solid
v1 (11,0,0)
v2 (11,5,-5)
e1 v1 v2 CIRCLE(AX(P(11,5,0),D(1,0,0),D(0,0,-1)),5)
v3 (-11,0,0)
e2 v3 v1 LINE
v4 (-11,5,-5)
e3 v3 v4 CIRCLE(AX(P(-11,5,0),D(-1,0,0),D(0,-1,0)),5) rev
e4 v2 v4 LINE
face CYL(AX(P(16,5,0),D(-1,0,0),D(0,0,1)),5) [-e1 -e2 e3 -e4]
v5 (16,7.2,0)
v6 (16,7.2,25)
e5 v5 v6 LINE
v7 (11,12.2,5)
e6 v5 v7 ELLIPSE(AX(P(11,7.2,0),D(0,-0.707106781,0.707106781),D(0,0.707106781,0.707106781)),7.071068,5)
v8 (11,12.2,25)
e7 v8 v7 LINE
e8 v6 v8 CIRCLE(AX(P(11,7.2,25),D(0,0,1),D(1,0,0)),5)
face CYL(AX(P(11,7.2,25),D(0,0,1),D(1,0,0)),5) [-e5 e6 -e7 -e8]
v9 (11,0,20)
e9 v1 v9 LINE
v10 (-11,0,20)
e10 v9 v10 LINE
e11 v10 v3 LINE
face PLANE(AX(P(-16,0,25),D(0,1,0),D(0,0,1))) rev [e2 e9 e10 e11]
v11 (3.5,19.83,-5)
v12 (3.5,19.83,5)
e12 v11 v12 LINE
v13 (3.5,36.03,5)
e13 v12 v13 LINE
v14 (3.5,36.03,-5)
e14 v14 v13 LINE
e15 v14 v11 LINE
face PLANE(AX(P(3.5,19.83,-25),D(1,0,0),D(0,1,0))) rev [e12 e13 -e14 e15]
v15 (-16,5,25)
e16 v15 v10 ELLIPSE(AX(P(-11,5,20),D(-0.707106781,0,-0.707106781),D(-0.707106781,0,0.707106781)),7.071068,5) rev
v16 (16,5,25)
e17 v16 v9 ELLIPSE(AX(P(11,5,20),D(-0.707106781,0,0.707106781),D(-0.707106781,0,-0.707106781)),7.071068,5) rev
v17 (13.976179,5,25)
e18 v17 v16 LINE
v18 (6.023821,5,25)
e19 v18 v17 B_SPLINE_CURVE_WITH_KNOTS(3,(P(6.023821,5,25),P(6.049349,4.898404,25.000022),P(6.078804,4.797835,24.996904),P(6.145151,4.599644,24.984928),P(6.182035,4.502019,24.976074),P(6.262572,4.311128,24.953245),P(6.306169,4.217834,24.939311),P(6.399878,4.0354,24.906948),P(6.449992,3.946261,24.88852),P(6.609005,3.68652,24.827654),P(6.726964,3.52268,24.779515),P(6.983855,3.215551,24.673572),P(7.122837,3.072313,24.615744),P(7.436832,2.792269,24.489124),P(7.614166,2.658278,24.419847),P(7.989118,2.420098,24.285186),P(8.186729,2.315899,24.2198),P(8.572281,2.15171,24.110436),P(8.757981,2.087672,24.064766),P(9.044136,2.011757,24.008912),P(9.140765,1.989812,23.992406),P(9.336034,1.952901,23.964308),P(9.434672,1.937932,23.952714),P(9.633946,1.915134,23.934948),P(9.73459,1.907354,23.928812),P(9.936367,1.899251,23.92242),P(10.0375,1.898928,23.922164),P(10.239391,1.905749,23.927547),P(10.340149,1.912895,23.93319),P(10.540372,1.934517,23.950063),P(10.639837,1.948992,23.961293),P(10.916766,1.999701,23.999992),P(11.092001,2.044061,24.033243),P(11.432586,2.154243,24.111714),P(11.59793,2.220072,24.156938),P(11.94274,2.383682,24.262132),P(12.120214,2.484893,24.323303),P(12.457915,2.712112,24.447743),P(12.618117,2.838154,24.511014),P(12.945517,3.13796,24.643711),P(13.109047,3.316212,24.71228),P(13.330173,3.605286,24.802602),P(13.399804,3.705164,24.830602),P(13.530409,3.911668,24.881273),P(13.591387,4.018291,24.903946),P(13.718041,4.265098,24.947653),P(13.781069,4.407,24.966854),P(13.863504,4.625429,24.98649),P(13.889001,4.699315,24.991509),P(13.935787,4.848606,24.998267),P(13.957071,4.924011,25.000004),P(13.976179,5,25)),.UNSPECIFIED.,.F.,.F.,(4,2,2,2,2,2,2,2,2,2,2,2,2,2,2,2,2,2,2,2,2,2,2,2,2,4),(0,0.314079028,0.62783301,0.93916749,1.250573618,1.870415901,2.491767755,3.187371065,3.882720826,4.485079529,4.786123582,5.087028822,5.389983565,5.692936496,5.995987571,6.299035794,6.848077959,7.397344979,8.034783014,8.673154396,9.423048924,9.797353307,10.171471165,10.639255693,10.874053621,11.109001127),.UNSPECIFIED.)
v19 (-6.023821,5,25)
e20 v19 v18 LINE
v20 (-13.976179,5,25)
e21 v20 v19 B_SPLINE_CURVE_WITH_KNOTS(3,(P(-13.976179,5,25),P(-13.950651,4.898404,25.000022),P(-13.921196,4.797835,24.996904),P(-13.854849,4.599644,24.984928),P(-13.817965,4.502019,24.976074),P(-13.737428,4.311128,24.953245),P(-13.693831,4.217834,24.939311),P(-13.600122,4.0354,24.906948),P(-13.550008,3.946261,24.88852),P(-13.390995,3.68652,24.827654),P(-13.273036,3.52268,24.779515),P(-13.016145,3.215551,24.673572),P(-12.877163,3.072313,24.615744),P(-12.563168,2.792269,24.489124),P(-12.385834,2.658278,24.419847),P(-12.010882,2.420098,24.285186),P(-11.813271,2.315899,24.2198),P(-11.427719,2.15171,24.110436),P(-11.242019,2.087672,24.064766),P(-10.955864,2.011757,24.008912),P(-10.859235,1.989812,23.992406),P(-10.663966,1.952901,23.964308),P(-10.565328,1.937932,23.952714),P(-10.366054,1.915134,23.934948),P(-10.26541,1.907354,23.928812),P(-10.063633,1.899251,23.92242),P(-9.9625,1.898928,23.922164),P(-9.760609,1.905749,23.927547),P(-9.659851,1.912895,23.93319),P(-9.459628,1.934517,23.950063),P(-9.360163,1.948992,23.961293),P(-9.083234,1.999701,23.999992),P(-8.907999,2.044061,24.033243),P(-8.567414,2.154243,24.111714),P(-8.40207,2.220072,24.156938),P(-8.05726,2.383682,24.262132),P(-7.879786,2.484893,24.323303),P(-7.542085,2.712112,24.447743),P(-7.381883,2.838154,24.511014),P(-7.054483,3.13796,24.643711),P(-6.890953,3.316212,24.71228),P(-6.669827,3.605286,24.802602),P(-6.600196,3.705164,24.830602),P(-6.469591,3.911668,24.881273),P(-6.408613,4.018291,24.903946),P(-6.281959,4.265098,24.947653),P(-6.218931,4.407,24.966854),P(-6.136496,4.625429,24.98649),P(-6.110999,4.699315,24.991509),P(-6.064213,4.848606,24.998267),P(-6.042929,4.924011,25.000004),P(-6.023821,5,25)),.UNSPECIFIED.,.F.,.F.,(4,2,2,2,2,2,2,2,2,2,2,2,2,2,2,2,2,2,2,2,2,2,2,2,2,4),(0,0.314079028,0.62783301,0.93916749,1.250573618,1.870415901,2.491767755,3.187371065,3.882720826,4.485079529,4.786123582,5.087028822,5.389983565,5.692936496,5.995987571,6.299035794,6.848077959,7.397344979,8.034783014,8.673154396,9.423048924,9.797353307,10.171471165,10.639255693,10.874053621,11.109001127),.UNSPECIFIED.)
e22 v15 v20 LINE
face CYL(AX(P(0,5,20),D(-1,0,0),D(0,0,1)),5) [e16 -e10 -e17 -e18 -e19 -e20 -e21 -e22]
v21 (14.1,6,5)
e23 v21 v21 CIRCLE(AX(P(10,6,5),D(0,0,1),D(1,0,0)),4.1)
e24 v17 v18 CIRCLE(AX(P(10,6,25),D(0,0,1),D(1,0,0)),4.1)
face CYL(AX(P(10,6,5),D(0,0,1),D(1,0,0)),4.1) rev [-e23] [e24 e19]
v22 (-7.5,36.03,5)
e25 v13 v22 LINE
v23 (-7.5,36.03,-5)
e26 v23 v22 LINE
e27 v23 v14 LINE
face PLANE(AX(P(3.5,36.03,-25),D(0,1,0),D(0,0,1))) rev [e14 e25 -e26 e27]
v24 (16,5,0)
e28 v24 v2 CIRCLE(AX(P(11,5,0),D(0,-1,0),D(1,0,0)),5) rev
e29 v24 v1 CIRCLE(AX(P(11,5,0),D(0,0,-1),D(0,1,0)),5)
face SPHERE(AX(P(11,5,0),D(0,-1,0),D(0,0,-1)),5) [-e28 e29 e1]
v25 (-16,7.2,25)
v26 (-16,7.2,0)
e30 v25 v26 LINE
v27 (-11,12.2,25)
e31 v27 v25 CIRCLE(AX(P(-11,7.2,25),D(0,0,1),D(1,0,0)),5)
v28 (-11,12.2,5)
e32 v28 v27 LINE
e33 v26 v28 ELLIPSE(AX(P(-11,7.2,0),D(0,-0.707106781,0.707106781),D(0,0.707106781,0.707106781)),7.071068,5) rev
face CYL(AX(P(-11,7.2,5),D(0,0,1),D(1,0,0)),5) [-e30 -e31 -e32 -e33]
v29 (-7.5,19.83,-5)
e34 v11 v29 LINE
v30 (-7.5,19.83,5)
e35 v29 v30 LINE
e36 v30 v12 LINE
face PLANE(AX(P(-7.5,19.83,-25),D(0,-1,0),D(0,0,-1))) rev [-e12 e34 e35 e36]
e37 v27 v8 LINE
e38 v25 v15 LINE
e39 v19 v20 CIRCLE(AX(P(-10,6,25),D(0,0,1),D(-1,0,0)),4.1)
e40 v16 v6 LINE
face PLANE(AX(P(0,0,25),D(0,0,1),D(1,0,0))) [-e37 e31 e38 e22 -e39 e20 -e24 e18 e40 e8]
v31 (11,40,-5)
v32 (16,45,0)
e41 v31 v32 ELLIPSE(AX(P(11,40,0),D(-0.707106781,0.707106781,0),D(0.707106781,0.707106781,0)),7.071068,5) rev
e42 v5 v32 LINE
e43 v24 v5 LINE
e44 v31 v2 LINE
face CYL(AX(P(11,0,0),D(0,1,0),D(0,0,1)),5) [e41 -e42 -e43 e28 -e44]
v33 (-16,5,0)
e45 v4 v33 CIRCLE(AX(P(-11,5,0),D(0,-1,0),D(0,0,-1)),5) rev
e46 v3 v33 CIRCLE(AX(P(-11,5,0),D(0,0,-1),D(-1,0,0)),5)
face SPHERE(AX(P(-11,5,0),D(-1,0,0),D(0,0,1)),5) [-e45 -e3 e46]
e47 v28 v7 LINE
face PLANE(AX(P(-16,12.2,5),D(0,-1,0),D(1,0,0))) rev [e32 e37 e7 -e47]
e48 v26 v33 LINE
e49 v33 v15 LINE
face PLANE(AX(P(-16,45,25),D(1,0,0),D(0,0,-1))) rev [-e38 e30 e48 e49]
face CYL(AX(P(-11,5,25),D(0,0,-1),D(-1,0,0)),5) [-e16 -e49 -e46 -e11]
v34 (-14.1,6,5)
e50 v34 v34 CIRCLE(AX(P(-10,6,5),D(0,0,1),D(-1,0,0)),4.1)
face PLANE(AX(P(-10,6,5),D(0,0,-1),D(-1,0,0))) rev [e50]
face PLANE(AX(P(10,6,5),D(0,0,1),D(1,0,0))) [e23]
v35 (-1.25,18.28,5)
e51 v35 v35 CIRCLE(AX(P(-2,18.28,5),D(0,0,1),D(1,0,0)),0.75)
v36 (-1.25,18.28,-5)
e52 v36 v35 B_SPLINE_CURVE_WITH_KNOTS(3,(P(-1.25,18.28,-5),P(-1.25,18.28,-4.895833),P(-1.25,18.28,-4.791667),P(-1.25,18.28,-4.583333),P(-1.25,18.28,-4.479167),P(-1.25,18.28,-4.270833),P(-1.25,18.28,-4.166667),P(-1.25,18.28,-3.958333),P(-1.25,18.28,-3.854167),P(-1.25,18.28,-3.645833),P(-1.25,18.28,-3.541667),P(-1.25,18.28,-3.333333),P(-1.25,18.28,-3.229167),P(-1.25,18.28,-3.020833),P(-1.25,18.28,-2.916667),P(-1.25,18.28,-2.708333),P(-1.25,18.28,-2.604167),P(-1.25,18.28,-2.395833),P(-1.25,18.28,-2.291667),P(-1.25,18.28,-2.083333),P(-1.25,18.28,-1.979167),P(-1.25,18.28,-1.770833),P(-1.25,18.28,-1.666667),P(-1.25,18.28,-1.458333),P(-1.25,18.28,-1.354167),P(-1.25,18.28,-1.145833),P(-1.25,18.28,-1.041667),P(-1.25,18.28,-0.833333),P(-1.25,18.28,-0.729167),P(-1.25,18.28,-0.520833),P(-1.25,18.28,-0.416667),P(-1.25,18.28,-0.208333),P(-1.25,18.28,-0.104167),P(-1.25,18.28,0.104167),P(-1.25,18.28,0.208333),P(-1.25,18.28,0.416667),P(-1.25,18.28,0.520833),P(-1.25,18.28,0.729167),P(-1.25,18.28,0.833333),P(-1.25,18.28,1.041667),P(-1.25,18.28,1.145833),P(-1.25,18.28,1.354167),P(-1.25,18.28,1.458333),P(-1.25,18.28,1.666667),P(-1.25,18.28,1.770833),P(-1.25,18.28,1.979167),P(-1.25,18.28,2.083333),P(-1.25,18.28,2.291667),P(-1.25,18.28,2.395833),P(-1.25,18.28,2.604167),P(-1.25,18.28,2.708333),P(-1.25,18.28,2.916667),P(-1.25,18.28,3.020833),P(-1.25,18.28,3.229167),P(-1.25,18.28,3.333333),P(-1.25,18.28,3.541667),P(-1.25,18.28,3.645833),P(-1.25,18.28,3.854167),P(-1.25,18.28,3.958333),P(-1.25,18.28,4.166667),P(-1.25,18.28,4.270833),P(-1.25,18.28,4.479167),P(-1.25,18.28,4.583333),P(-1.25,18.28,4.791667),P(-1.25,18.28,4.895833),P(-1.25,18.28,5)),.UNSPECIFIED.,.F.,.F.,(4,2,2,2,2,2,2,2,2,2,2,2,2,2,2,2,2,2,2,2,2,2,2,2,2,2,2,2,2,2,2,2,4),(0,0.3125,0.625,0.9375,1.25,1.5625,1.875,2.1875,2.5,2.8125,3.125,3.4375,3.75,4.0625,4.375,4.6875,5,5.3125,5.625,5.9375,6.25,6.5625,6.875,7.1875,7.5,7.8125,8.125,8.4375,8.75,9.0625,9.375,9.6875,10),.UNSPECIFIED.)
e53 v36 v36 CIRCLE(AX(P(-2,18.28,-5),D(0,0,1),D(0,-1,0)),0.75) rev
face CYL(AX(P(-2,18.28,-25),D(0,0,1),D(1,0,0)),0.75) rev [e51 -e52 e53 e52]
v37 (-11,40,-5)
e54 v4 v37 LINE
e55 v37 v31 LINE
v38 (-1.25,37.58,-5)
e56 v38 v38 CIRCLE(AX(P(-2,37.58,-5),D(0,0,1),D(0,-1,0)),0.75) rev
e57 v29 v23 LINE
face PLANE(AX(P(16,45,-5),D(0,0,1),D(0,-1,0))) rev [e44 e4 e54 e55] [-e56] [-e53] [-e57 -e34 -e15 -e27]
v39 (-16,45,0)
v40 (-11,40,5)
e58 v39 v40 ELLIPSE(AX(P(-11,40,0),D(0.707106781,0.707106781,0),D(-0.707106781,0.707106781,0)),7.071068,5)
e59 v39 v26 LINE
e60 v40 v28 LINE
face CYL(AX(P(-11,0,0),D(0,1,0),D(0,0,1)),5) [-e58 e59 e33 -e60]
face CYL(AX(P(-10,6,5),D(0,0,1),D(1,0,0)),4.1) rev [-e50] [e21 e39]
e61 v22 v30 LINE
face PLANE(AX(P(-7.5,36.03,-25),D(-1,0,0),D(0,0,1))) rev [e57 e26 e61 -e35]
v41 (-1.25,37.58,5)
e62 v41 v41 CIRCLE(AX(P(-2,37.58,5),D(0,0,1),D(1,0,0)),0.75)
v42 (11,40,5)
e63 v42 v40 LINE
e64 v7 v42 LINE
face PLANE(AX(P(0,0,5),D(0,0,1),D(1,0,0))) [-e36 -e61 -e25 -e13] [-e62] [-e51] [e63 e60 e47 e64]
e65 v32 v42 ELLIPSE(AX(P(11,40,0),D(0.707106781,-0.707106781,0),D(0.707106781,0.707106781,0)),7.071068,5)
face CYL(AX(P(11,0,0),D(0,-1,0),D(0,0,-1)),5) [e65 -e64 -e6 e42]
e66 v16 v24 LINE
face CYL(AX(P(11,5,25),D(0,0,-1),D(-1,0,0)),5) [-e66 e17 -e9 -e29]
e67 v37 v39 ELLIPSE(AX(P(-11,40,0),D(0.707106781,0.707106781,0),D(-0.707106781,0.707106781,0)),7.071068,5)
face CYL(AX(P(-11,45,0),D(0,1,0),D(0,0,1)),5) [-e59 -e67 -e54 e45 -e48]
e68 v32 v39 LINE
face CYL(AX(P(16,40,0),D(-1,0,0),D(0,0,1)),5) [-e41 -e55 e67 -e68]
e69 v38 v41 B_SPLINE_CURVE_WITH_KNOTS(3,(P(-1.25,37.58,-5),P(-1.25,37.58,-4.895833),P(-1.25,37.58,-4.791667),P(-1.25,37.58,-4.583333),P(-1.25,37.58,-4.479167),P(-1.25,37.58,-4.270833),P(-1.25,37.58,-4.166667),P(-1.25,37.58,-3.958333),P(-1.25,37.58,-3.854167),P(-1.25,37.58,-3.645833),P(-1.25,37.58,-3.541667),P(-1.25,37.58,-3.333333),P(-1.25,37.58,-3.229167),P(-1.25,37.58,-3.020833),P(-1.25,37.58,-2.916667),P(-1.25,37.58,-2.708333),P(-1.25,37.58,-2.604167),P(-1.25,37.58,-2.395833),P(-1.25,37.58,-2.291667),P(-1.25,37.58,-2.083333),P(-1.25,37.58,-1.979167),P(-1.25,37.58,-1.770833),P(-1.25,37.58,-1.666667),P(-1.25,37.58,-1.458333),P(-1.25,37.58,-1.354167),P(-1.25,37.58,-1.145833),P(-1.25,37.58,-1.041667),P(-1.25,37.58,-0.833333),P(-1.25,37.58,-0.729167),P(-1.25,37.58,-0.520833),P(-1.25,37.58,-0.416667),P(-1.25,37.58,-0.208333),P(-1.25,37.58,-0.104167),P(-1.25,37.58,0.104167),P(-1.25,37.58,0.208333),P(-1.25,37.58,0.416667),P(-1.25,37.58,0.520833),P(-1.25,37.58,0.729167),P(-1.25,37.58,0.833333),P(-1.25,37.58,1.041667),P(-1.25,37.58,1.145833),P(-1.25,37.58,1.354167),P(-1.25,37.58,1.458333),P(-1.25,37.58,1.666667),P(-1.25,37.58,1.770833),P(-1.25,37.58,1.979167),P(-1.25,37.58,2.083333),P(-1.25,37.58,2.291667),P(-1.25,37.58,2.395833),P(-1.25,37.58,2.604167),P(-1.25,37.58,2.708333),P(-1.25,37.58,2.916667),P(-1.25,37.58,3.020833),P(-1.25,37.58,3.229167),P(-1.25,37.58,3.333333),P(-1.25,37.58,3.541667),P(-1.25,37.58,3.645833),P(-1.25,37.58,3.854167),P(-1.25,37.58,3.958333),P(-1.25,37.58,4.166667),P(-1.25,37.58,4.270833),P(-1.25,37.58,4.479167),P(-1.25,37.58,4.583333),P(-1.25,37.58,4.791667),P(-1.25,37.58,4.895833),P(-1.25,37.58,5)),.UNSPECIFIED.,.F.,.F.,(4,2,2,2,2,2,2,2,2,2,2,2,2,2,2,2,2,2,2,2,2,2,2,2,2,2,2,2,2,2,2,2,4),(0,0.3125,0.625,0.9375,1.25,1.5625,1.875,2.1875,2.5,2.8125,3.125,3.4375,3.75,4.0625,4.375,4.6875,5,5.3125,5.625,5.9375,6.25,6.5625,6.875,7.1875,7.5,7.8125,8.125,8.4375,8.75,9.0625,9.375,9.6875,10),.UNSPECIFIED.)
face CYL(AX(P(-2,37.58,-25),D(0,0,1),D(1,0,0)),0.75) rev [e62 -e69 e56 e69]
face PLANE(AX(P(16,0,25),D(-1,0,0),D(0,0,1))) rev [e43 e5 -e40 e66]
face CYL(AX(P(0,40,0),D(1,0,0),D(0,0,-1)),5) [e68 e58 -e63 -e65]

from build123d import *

# Parameters (mm, degrees)
SKETCH1_W           = 32
SKETCH1_H           = 45
BOSS_EXTRUDE1_DEPTH = 25
SKETCH2_R           = 4.1
CUT_EXTRUDE1_DEPTH  = 20
SKETCH3_W           = 32
SKETCH3_H           = 32.8
CUT_EXTRUDE2_DEPTH  = 20
SKETCH4_R           = 0.75
SKETCH4_W           = 11
SKETCH4_H           = 16.2
CUT_EXTRUDE3_DEPTH  = 57.400354609
SKETCH5_W           = 20
SKETCH5_H           = 45
CUT_EXTRUDE5_DEPTH  = 61.613529843
FILLET1_R           = 5


with BuildPart() as part:
    # Sketch1 → Boss-Extrude1 (new, symmetric)
    with BuildSketch(Plane.XY):
        with Locations((0, 22.5)):
            Rectangle(SKETCH1_W, SKETCH1_H)
    extrude(amount=BOSS_EXTRUDE1_DEPTH, both=True)

    # Sketch2 → Cut-Extrude1 (cut)
    with BuildSketch(Plane.XY.offset(25)):
        with Locations((10, 6)):
            Circle(SKETCH2_R)
        with Locations(Location((-10, 6, 0), (0, 0, 180))):
            Circle(SKETCH2_R)
    extrude(amount=-CUT_EXTRUDE1_DEPTH, mode=Mode.SUBTRACT)

    # Sketch3 → Cut-Extrude2 (cut)
    with BuildSketch(Plane.XY.offset(25)):
        with Locations((0, 28.6)):
            Rectangle(SKETCH3_W, SKETCH3_H)
    extrude(amount=-CUT_EXTRUDE2_DEPTH, mode=Mode.SUBTRACT)

    # Sketch4 → Cut-Extrude3 (cut, through all)
    with BuildSketch(Plane.XY.offset(5)):
        with Locations((-2, 37.58)):
            Circle(SKETCH4_R)
        with Locations((-2, 18.28)):
            Circle(SKETCH4_R)
        with Locations((-2, 27.93)):
            Rectangle(SKETCH4_W, SKETCH4_H)
    extrude(amount=-CUT_EXTRUDE3_DEPTH, mode=Mode.SUBTRACT)

    # Sketch5 → Cut-Extrude5 (cut, through all)
    with BuildSketch(Plane.ZY.offset(16)):
        with Locations((-15, 22.5)):
            Rectangle(SKETCH5_W, SKETCH5_H)
    extrude(amount=-CUT_EXTRUDE5_DEPTH, mode=Mode.SUBTRACT)

    # Fillet1
    # the kernel refuses this fillet: 5 mm, written as the material it takes off along each edge
    with BuildSketch(Plane(origin=(-11, 5, 0), x_dir=(-1, 0, 0), z_dir=(0, -1, 0))) as fillet1_piece_1_section:
        Polygon((0, 0), (FILLET1_R * 1.02, 0), (FILLET1_R * 1.02, FILLET1_R * 1.02), (0, FILLET1_R * 1.02), align=None)
    fillet1_piece_1 = extrude(amount=FILLET1_R * 1.02, mode=Mode.PRIVATE)
    fillet1_piece_1 = fillet1_piece_1 - Plane(origin=(-11, 5, 0), x_dir=(0.7071067811865475, 0, 0.7071067811865475), z_dir=(0, -1, 0)) * Sphere(FILLET1_R, mode=Mode.PRIVATE)
    add(fillet1_piece_1, mode=Mode.SUBTRACT)
    with BuildSketch(Plane(origin=(11, 5, 0), x_dir=(1, 0, 0), z_dir=(0, -1, 0))) as fillet1_piece_2_section:
        Polygon((0, 0), (FILLET1_R * 1.02, 0), (FILLET1_R * 1.02, -FILLET1_R * 1.02), (0, -FILLET1_R * 1.02), align=None)
    fillet1_piece_2 = extrude(amount=FILLET1_R * 1.02, mode=Mode.PRIVATE)
    fillet1_piece_2 = fillet1_piece_2 - Plane(origin=(11, 5, 0), x_dir=(-0.7071067811865475, 0, 0.7071067811865475), z_dir=(0, -1, 0)) * Sphere(FILLET1_R, mode=Mode.PRIVATE)
    add(fillet1_piece_2, mode=Mode.SUBTRACT)
    with BuildSketch(Plane(origin=(16, 12.2, 25), x_dir=(0, -1, 0), z_dir=(0, 0, -1))) as fillet1_piece_3:
        with BuildLine():
            CenterArc((FILLET1_R, FILLET1_R), FILLET1_R, 180, 90)
            Line((0, FILLET1_R), (-FILLET1_R * 0.02, FILLET1_R))
            Line((-FILLET1_R * 0.02, FILLET1_R), (-FILLET1_R * 0.02, -FILLET1_R * 0.02))
            Line((-FILLET1_R * 0.02, -FILLET1_R * 0.02), (FILLET1_R, -FILLET1_R * 0.02))
            Line((FILLET1_R, -FILLET1_R * 0.02), (FILLET1_R, 0))
        make_face()
    extrude(amount=20, mode=Mode.SUBTRACT)
    with BuildSketch(Plane(origin=(-11, 0, -5), x_dir=(0, 0, 1), z_dir=(1, 0, 0))) as fillet1_piece_4:
        with BuildLine():
            CenterArc((FILLET1_R, -FILLET1_R), FILLET1_R, 90, 90)
            Line((0, -FILLET1_R), (-FILLET1_R * 0.02, -FILLET1_R))
            Line((-FILLET1_R * 0.02, -FILLET1_R), (-FILLET1_R * 0.02, FILLET1_R * 0.02))
            Line((-FILLET1_R * 0.02, FILLET1_R * 0.02), (FILLET1_R, FILLET1_R * 0.02))
            Line((FILLET1_R, FILLET1_R * 0.02), (FILLET1_R, 0))
        make_face()
    extrude(amount=22, mode=Mode.SUBTRACT)
    with BuildSketch(Plane(origin=(-16, 45, -5), x_dir=(0, -1, 0), z_dir=(1, 0, 0)), Plane(origin=(16, 45, 5), x_dir=(0, -1, 0), z_dir=(-1, 0, 0))) as fillet1_piece_5:
        with BuildLine():
            CenterArc((FILLET1_R, -FILLET1_R), FILLET1_R, 90, 90)
            Line((0, -FILLET1_R), (-FILLET1_R * 0.02, -FILLET1_R))
            Line((-FILLET1_R * 0.02, -FILLET1_R), (-FILLET1_R * 0.02, FILLET1_R * 0.02))
            Line((-FILLET1_R * 0.02, FILLET1_R * 0.02), (FILLET1_R, FILLET1_R * 0.02))
            Line((FILLET1_R, FILLET1_R * 0.02), (FILLET1_R, 0))
        make_face()
    extrude(amount=32, mode=Mode.SUBTRACT)
    with BuildSketch(Plane(origin=(-16, 45, -5), x_dir=(0, 0, 1), z_dir=(0, -1, 0)), Plane(origin=(16, 5, -5), x_dir=(0, 0, 1), z_dir=(0, 1, 0))) as fillet1_piece_6:
        with BuildLine():
            CenterArc((FILLET1_R, -FILLET1_R), FILLET1_R, 90, 90)
            Line((0, -FILLET1_R), (-FILLET1_R * 0.02, -FILLET1_R))
            Line((-FILLET1_R * 0.02, -FILLET1_R), (-FILLET1_R * 0.02, FILLET1_R * 0.02))
            Line((-FILLET1_R * 0.02, FILLET1_R * 0.02), (FILLET1_R, FILLET1_R * 0.02))
            Line((FILLET1_R, FILLET1_R * 0.02), (FILLET1_R, 0))
        make_face()
    extrude(amount=40, mode=Mode.SUBTRACT)
    with BuildSketch(Plane(origin=(16, 0, 0), x_dir=(-1, 0, 0), z_dir=(0, 0, 1)), Plane(origin=(-16, 0, 25), x_dir=(1, 0, 0), z_dir=(0, 0, -1))) as fillet1_piece_7:
        with BuildLine():
            CenterArc((FILLET1_R, -FILLET1_R), FILLET1_R, 90, 90)
            Line((0, -FILLET1_R), (-FILLET1_R * 0.02, -FILLET1_R))
            Line((-FILLET1_R * 0.02, -FILLET1_R), (-FILLET1_R * 0.02, FILLET1_R * 0.02))
            Line((-FILLET1_R * 0.02, FILLET1_R * 0.02), (FILLET1_R, FILLET1_R * 0.02))
            Line((FILLET1_R, FILLET1_R * 0.02), (FILLET1_R, 0))
        make_face()
    extrude(amount=25, mode=Mode.SUBTRACT)
    with BuildSketch(Plane(origin=(-16, 0, 25), x_dir=(0, 0, -1), z_dir=(1, 0, 0))) as fillet1_piece_8:
        with BuildLine():
            CenterArc((FILLET1_R, FILLET1_R), FILLET1_R, 180, 90)
            Line((0, FILLET1_R), (-FILLET1_R * 0.02, FILLET1_R))
            Line((-FILLET1_R * 0.02, FILLET1_R), (-FILLET1_R * 0.02, -FILLET1_R * 0.02))
            Line((-FILLET1_R * 0.02, -FILLET1_R * 0.02), (FILLET1_R, -FILLET1_R * 0.02))
            Line((FILLET1_R, -FILLET1_R * 0.02), (FILLET1_R, 0))
        make_face()
    extrude(amount=32, mode=Mode.SUBTRACT)
    with BuildSketch(Plane(origin=(-16, 12.2, 25), x_dir=(0, -1, 0), z_dir=(0, 0, -1))) as fillet1_piece_9:
        with BuildLine():
            CenterArc((FILLET1_R, -FILLET1_R), FILLET1_R, 90, 90)
            Line((0, -FILLET1_R), (-FILLET1_R * 0.02, -FILLET1_R))
            Line((-FILLET1_R * 0.02, -FILLET1_R), (-FILLET1_R * 0.02, FILLET1_R * 0.02))
            Line((-FILLET1_R * 0.02, FILLET1_R * 0.02), (FILLET1_R, FILLET1_R * 0.02))
            Line((FILLET1_R, FILLET1_R * 0.02), (FILLET1_R, 0))
        make_face()
    extrude(amount=20, mode=Mode.SUBTRACT)
    with BuildSketch(Plane(origin=(16, 12.2, 5), x_dir=(0, 0, -1), z_dir=(0, 1, 0)), Plane(origin=(-16, 45, 5), x_dir=(0, 0, -1), z_dir=(0, -1, 0))) as fillet1_piece_10:
        with BuildLine():
            CenterArc((FILLET1_R, FILLET1_R), FILLET1_R, 180, 90)
            Line((0, FILLET1_R), (-FILLET1_R * 0.02, FILLET1_R))
            Line((-FILLET1_R * 0.02, FILLET1_R), (-FILLET1_R * 0.02, -FILLET1_R * 0.02))
            Line((-FILLET1_R * 0.02, -FILLET1_R * 0.02), (FILLET1_R, -FILLET1_R * 0.02))
            Line((FILLET1_R, -FILLET1_R * 0.02), (FILLET1_R, 0))
        make_face()
    extrude(amount=32.8, mode=Mode.SUBTRACT)
    with BuildSketch(Plane(origin=(16, 12.2, 25), x_dir=(0, -1, 0), z_dir=(0, 0, -1))) as fillet1_piece_11a_section:
        with BuildLine():
            CenterArc((FILLET1_R, FILLET1_R), FILLET1_R, 180, 90)
            Line((0, FILLET1_R), (-FILLET1_R * 0.02, FILLET1_R))
            Line((-FILLET1_R * 0.02, FILLET1_R), (-FILLET1_R * 0.02, -FILLET1_R * 0.02))
            Line((-FILLET1_R * 0.02, -FILLET1_R * 0.02), (FILLET1_R, -FILLET1_R * 0.02))
            Line((FILLET1_R, -FILLET1_R * 0.02), (FILLET1_R, 0))
        make_face()
    fillet1_piece_11a = extrude(amount=32.5, mode=Mode.PRIVATE)
    fillet1_piece_11a = split(fillet1_piece_11a, bisect_by=Plane(origin=(14.868024429, 11.068024429, 5), z_dir=(0, 0, -1)), keep=Keep.TOP, mode=Mode.PRIVATE)
    with BuildSketch(Plane(origin=(16, -0.3, 5), x_dir=(0, 0, -1), z_dir=(0, 1, 0))) as fillet1_piece_11b_section:
        with BuildLine():
            CenterArc((FILLET1_R, FILLET1_R), FILLET1_R, 180, 90)
            Line((0, FILLET1_R), (-FILLET1_R * 0.02, FILLET1_R))
            Line((-FILLET1_R * 0.02, FILLET1_R), (-FILLET1_R * 0.02, -FILLET1_R * 0.02))
            Line((-FILLET1_R * 0.02, -FILLET1_R * 0.02), (FILLET1_R, -FILLET1_R * 0.02))
            Line((FILLET1_R, -FILLET1_R * 0.02), (FILLET1_R, 0))
        make_face()
    fillet1_piece_11b = extrude(amount=45.3, mode=Mode.PRIVATE)
    fillet1_piece_11b = split(fillet1_piece_11b, bisect_by=Plane(origin=(14.868024429, 12.2, 3.868024429), z_dir=(0, -1, 0)), keep=Keep.TOP, mode=Mode.PRIVATE)
    fillet1_piece_11 = fillet1_piece_11a & fillet1_piece_11b
    add(fillet1_piece_11, mode=Mode.SUBTRACT)
    with BuildSketch(Plane(origin=(-16, 57.5, -5), x_dir=(0, 0, 1), z_dir=(0, -1, 0))) as fillet1_piece_12a_section:
        with BuildLine():
            CenterArc((FILLET1_R, -FILLET1_R), FILLET1_R, 90, 90)
            Line((0, -FILLET1_R), (-FILLET1_R * 0.02, -FILLET1_R))
            Line((-FILLET1_R * 0.02, -FILLET1_R), (-FILLET1_R * 0.02, FILLET1_R * 0.02))
            Line((-FILLET1_R * 0.02, FILLET1_R * 0.02), (FILLET1_R, FILLET1_R * 0.02))
            Line((FILLET1_R, FILLET1_R * 0.02), (FILLET1_R, 0))
        make_face()
    fillet1_piece_12a = extrude(amount=52.5, mode=Mode.PRIVATE)
    fillet1_piece_12a = split(fillet1_piece_12a, bisect_by=Plane(origin=(-14.868024429, 45, -3.868024429), z_dir=(0, 1, 0)), keep=Keep.TOP, mode=Mode.PRIVATE)
    with BuildSketch(Plane(origin=(-28.5, 45, -5), x_dir=(0, -1, 0), z_dir=(1, 0, 0))) as fillet1_piece_12b_section:
        with BuildLine():
            CenterArc((FILLET1_R, -FILLET1_R), FILLET1_R, 90, 90)
            Line((0, -FILLET1_R), (-FILLET1_R * 0.02, -FILLET1_R))
            Line((-FILLET1_R * 0.02, -FILLET1_R), (-FILLET1_R * 0.02, FILLET1_R * 0.02))
            Line((-FILLET1_R * 0.02, FILLET1_R * 0.02), (FILLET1_R, FILLET1_R * 0.02))
            Line((FILLET1_R, FILLET1_R * 0.02), (FILLET1_R, 0))
        make_face()
    fillet1_piece_12b = extrude(amount=44.5, mode=Mode.PRIVATE)
    fillet1_piece_12b = split(fillet1_piece_12b, bisect_by=Plane(origin=(-16, 43.868024429, -3.868024429), z_dir=(-1, 0, 0)), keep=Keep.TOP, mode=Mode.PRIVATE)
    fillet1_piece_12 = fillet1_piece_12a & fillet1_piece_12b
    add(fillet1_piece_12, mode=Mode.SUBTRACT)
    with BuildSketch(Plane(origin=(16, 5, -5), x_dir=(0, 0, 1), z_dir=(0, 1, 0))) as fillet1_piece_13a_section:
        with BuildLine():
            CenterArc((FILLET1_R, -FILLET1_R), FILLET1_R, 90, 90)
            Line((0, -FILLET1_R), (-FILLET1_R * 0.02, -FILLET1_R))
            Line((-FILLET1_R * 0.02, -FILLET1_R), (-FILLET1_R * 0.02, FILLET1_R * 0.02))
            Line((-FILLET1_R * 0.02, FILLET1_R * 0.02), (FILLET1_R, FILLET1_R * 0.02))
            Line((FILLET1_R, FILLET1_R * 0.02), (FILLET1_R, 0))
        make_face()
    fillet1_piece_13a = extrude(amount=52.5, mode=Mode.PRIVATE)
    fillet1_piece_13a = split(fillet1_piece_13a, bisect_by=Plane(origin=(14.868024429, 45, -3.868024429), z_dir=(0, 1, 0)), keep=Keep.TOP, mode=Mode.PRIVATE)
    with BuildSketch(Plane(origin=(-16, 45, -5), x_dir=(0, -1, 0), z_dir=(1, 0, 0))) as fillet1_piece_13b_section:
        with BuildLine():
            CenterArc((FILLET1_R, -FILLET1_R), FILLET1_R, 90, 90)
            Line((0, -FILLET1_R), (-FILLET1_R * 0.02, -FILLET1_R))
            Line((-FILLET1_R * 0.02, -FILLET1_R), (-FILLET1_R * 0.02, FILLET1_R * 0.02))
            Line((-FILLET1_R * 0.02, FILLET1_R * 0.02), (FILLET1_R, FILLET1_R * 0.02))
            Line((FILLET1_R, FILLET1_R * 0.02), (FILLET1_R, 0))
        make_face()
    fillet1_piece_13b = extrude(amount=44.5, mode=Mode.PRIVATE)
    fillet1_piece_13b = split(fillet1_piece_13b, bisect_by=Plane(origin=(16, 43.868024429, -3.868024429), z_dir=(1, 0, 0)), keep=Keep.TOP, mode=Mode.PRIVATE)
    fillet1_piece_13 = fillet1_piece_13a & fillet1_piece_13b
    add(fillet1_piece_13, mode=Mode.SUBTRACT)
    with BuildSketch(Plane(origin=(-16, 0, 25), x_dir=(0, 0, -1), z_dir=(1, 0, 0))) as fillet1_piece_14a_section:
        with BuildLine():
            CenterArc((FILLET1_R, FILLET1_R), FILLET1_R, 180, 90)
            Line((0, FILLET1_R), (-FILLET1_R * 0.02, FILLET1_R))
            Line((-FILLET1_R * 0.02, FILLET1_R), (-FILLET1_R * 0.02, -FILLET1_R * 0.02))
            Line((-FILLET1_R * 0.02, -FILLET1_R * 0.02), (FILLET1_R, -FILLET1_R * 0.02))
            Line((FILLET1_R, -FILLET1_R * 0.02), (FILLET1_R, 0))
        make_face()
    fillet1_piece_14a = extrude(amount=44.5, mode=Mode.PRIVATE)
    fillet1_piece_14a = split(fillet1_piece_14a, bisect_by=Plane(origin=(16, 1.131975571, 23.868024429), z_dir=(1, 0, 0)), keep=Keep.TOP, mode=Mode.PRIVATE)
    with BuildSketch(Plane(origin=(16, 0, 0), x_dir=(-1, 0, 0), z_dir=(0, 0, 1))) as fillet1_piece_14b_section:
        with BuildLine():
            CenterArc((FILLET1_R, -FILLET1_R), FILLET1_R, 90, 90)
            Line((0, -FILLET1_R), (-FILLET1_R * 0.02, -FILLET1_R))
            Line((-FILLET1_R * 0.02, -FILLET1_R), (-FILLET1_R * 0.02, FILLET1_R * 0.02))
            Line((-FILLET1_R * 0.02, FILLET1_R * 0.02), (FILLET1_R, FILLET1_R * 0.02))
            Line((FILLET1_R, FILLET1_R * 0.02), (FILLET1_R, 0))
        make_face()
    fillet1_piece_14b = extrude(amount=37.5, mode=Mode.PRIVATE)
    fillet1_piece_14b = split(fillet1_piece_14b, bisect_by=Plane(origin=(14.868024429, 1.131975571, 25), z_dir=(0, 0, 1)), keep=Keep.TOP, mode=Mode.PRIVATE)
    fillet1_piece_14 = fillet1_piece_14a & fillet1_piece_14b
    add(fillet1_piece_14, mode=Mode.SUBTRACT)
    with BuildSketch(Plane(origin=(-16, 0, 37.5), x_dir=(1, 0, 0), z_dir=(0, 0, -1))) as fillet1_piece_15a_section:
        with BuildLine():
            CenterArc((FILLET1_R, -FILLET1_R), FILLET1_R, 90, 90)
            Line((0, -FILLET1_R), (-FILLET1_R * 0.02, -FILLET1_R))
            Line((-FILLET1_R * 0.02, -FILLET1_R), (-FILLET1_R * 0.02, FILLET1_R * 0.02))
            Line((-FILLET1_R * 0.02, FILLET1_R * 0.02), (FILLET1_R, FILLET1_R * 0.02))
            Line((FILLET1_R, FILLET1_R * 0.02), (FILLET1_R, 0))
        make_face()
    fillet1_piece_15a = extrude(amount=37.5, mode=Mode.PRIVATE)
    fillet1_piece_15a = split(fillet1_piece_15a, bisect_by=Plane(origin=(-14.868024429, 1.131975571, 25), z_dir=(0, 0, 1)), keep=Keep.TOP, mode=Mode.PRIVATE)
    with BuildSketch(Plane(origin=(-28.5, 0, 25), x_dir=(0, 0, -1), z_dir=(1, 0, 0))) as fillet1_piece_15b_section:
        with BuildLine():
            CenterArc((FILLET1_R, FILLET1_R), FILLET1_R, 180, 90)
            Line((0, FILLET1_R), (-FILLET1_R * 0.02, FILLET1_R))
            Line((-FILLET1_R * 0.02, FILLET1_R), (-FILLET1_R * 0.02, -FILLET1_R * 0.02))
            Line((-FILLET1_R * 0.02, -FILLET1_R * 0.02), (FILLET1_R, -FILLET1_R * 0.02))
            Line((FILLET1_R, -FILLET1_R * 0.02), (FILLET1_R, 0))
        make_face()
    fillet1_piece_15b = extrude(amount=44.5, mode=Mode.PRIVATE)
    fillet1_piece_15b = split(fillet1_piece_15b, bisect_by=Plane(origin=(-16, 1.131975571, 23.868024429), z_dir=(-1, 0, 0)), keep=Keep.TOP, mode=Mode.PRIVATE)
    fillet1_piece_15 = fillet1_piece_15a & fillet1_piece_15b
    add(fillet1_piece_15, mode=Mode.SUBTRACT)
    with BuildSketch(Plane(origin=(-16, 45, 5), x_dir=(0, 0, -1), z_dir=(0, -1, 0))) as fillet1_piece_16a_section:
        with BuildLine():
            CenterArc((FILLET1_R, FILLET1_R), FILLET1_R, 180, 90)
            Line((0, FILLET1_R), (-FILLET1_R * 0.02, FILLET1_R))
            Line((-FILLET1_R * 0.02, FILLET1_R), (-FILLET1_R * 0.02, -FILLET1_R * 0.02))
            Line((-FILLET1_R * 0.02, -FILLET1_R * 0.02), (FILLET1_R, -FILLET1_R * 0.02))
            Line((FILLET1_R, -FILLET1_R * 0.02), (FILLET1_R, 0))
        make_face()
    fillet1_piece_16a = extrude(amount=45.3, mode=Mode.PRIVATE)
    fillet1_piece_16a = split(fillet1_piece_16a, bisect_by=Plane(origin=(-14.868024429, 12.2, 3.868024429), z_dir=(0, -1, 0)), keep=Keep.TOP, mode=Mode.PRIVATE)
    with BuildSketch(Plane(origin=(-16, 12.2, 25), x_dir=(0, -1, 0), z_dir=(0, 0, -1))) as fillet1_piece_16b_section:
        with BuildLine():
            CenterArc((FILLET1_R, -FILLET1_R), FILLET1_R, 90, 90)
            Line((0, -FILLET1_R), (-FILLET1_R * 0.02, -FILLET1_R))
            Line((-FILLET1_R * 0.02, -FILLET1_R), (-FILLET1_R * 0.02, FILLET1_R * 0.02))
            Line((-FILLET1_R * 0.02, FILLET1_R * 0.02), (FILLET1_R, FILLET1_R * 0.02))
            Line((FILLET1_R, FILLET1_R * 0.02), (FILLET1_R, 0))
        make_face()
    fillet1_piece_16b = extrude(amount=32.5, mode=Mode.PRIVATE)
    fillet1_piece_16b = split(fillet1_piece_16b, bisect_by=Plane(origin=(-14.868024429, 11.068024429, 5), z_dir=(0, 0, -1)), keep=Keep.TOP, mode=Mode.PRIVATE)
    fillet1_piece_16 = fillet1_piece_16a & fillet1_piece_16b
    add(fillet1_piece_16, mode=Mode.SUBTRACT)
    with BuildSketch(Plane(origin=(16, 12.2, 5), x_dir=(0, 0, -1), z_dir=(0, 1, 0))) as fillet1_piece_17a_section:
        with BuildLine():
            CenterArc((FILLET1_R, FILLET1_R), FILLET1_R, 180, 90)
            Line((0, FILLET1_R), (-FILLET1_R * 0.02, FILLET1_R))
            Line((-FILLET1_R * 0.02, FILLET1_R), (-FILLET1_R * 0.02, -FILLET1_R * 0.02))
            Line((-FILLET1_R * 0.02, -FILLET1_R * 0.02), (FILLET1_R, -FILLET1_R * 0.02))
            Line((FILLET1_R, -FILLET1_R * 0.02), (FILLET1_R, 0))
        make_face()
    fillet1_piece_17a = extrude(amount=45.3, mode=Mode.PRIVATE)
    fillet1_piece_17a = split(fillet1_piece_17a, bisect_by=Plane(origin=(14.868024429, 45, 3.868024429), z_dir=(0, 1, 0)), keep=Keep.TOP, mode=Mode.PRIVATE)
    with BuildSketch(Plane(origin=(28.5, 45, 5), x_dir=(0, -1, 0), z_dir=(-1, 0, 0))) as fillet1_piece_17b_section:
        with BuildLine():
            CenterArc((FILLET1_R, -FILLET1_R), FILLET1_R, 90, 90)
            Line((0, -FILLET1_R), (-FILLET1_R * 0.02, -FILLET1_R))
            Line((-FILLET1_R * 0.02, -FILLET1_R), (-FILLET1_R * 0.02, FILLET1_R * 0.02))
            Line((-FILLET1_R * 0.02, FILLET1_R * 0.02), (FILLET1_R, FILLET1_R * 0.02))
            Line((FILLET1_R, FILLET1_R * 0.02), (FILLET1_R, 0))
        make_face()
    fillet1_piece_17b = extrude(amount=44.5, mode=Mode.PRIVATE)
    fillet1_piece_17b = split(fillet1_piece_17b, bisect_by=Plane(origin=(16, 43.868024429, 3.868024429), z_dir=(1, 0, 0)), keep=Keep.TOP, mode=Mode.PRIVATE)
    fillet1_piece_17 = fillet1_piece_17a & fillet1_piece_17b
    add(fillet1_piece_17, mode=Mode.SUBTRACT)
    with BuildSketch(Plane(origin=(-16, 57.5, 5), x_dir=(0, 0, -1), z_dir=(0, -1, 0))) as fillet1_piece_18a_section:
        with BuildLine():
            CenterArc((FILLET1_R, FILLET1_R), FILLET1_R, 180, 90)
            Line((0, FILLET1_R), (-FILLET1_R * 0.02, FILLET1_R))
            Line((-FILLET1_R * 0.02, FILLET1_R), (-FILLET1_R * 0.02, -FILLET1_R * 0.02))
            Line((-FILLET1_R * 0.02, -FILLET1_R * 0.02), (FILLET1_R, -FILLET1_R * 0.02))
            Line((FILLET1_R, -FILLET1_R * 0.02), (FILLET1_R, 0))
        make_face()
    fillet1_piece_18a = extrude(amount=45.3, mode=Mode.PRIVATE)
    fillet1_piece_18a = split(fillet1_piece_18a, bisect_by=Plane(origin=(-14.868024429, 45, 3.868024429), z_dir=(0, 1, 0)), keep=Keep.TOP, mode=Mode.PRIVATE)
    with BuildSketch(Plane(origin=(16, 45, 5), x_dir=(0, -1, 0), z_dir=(-1, 0, 0))) as fillet1_piece_18b_section:
        with BuildLine():
            CenterArc((FILLET1_R, -FILLET1_R), FILLET1_R, 90, 90)
            Line((0, -FILLET1_R), (-FILLET1_R * 0.02, -FILLET1_R))
            Line((-FILLET1_R * 0.02, -FILLET1_R), (-FILLET1_R * 0.02, FILLET1_R * 0.02))
            Line((-FILLET1_R * 0.02, FILLET1_R * 0.02), (FILLET1_R, FILLET1_R * 0.02))
            Line((FILLET1_R, FILLET1_R * 0.02), (FILLET1_R, 0))
        make_face()
    fillet1_piece_18b = extrude(amount=44.5, mode=Mode.PRIVATE)
    fillet1_piece_18b = split(fillet1_piece_18b, bisect_by=Plane(origin=(-16, 43.868024429, 3.868024429), z_dir=(-1, 0, 0)), keep=Keep.TOP, mode=Mode.PRIVATE)
    fillet1_piece_18 = fillet1_piece_18a & fillet1_piece_18b
    add(fillet1_piece_18, mode=Mode.SUBTRACT)


solid = part.part
